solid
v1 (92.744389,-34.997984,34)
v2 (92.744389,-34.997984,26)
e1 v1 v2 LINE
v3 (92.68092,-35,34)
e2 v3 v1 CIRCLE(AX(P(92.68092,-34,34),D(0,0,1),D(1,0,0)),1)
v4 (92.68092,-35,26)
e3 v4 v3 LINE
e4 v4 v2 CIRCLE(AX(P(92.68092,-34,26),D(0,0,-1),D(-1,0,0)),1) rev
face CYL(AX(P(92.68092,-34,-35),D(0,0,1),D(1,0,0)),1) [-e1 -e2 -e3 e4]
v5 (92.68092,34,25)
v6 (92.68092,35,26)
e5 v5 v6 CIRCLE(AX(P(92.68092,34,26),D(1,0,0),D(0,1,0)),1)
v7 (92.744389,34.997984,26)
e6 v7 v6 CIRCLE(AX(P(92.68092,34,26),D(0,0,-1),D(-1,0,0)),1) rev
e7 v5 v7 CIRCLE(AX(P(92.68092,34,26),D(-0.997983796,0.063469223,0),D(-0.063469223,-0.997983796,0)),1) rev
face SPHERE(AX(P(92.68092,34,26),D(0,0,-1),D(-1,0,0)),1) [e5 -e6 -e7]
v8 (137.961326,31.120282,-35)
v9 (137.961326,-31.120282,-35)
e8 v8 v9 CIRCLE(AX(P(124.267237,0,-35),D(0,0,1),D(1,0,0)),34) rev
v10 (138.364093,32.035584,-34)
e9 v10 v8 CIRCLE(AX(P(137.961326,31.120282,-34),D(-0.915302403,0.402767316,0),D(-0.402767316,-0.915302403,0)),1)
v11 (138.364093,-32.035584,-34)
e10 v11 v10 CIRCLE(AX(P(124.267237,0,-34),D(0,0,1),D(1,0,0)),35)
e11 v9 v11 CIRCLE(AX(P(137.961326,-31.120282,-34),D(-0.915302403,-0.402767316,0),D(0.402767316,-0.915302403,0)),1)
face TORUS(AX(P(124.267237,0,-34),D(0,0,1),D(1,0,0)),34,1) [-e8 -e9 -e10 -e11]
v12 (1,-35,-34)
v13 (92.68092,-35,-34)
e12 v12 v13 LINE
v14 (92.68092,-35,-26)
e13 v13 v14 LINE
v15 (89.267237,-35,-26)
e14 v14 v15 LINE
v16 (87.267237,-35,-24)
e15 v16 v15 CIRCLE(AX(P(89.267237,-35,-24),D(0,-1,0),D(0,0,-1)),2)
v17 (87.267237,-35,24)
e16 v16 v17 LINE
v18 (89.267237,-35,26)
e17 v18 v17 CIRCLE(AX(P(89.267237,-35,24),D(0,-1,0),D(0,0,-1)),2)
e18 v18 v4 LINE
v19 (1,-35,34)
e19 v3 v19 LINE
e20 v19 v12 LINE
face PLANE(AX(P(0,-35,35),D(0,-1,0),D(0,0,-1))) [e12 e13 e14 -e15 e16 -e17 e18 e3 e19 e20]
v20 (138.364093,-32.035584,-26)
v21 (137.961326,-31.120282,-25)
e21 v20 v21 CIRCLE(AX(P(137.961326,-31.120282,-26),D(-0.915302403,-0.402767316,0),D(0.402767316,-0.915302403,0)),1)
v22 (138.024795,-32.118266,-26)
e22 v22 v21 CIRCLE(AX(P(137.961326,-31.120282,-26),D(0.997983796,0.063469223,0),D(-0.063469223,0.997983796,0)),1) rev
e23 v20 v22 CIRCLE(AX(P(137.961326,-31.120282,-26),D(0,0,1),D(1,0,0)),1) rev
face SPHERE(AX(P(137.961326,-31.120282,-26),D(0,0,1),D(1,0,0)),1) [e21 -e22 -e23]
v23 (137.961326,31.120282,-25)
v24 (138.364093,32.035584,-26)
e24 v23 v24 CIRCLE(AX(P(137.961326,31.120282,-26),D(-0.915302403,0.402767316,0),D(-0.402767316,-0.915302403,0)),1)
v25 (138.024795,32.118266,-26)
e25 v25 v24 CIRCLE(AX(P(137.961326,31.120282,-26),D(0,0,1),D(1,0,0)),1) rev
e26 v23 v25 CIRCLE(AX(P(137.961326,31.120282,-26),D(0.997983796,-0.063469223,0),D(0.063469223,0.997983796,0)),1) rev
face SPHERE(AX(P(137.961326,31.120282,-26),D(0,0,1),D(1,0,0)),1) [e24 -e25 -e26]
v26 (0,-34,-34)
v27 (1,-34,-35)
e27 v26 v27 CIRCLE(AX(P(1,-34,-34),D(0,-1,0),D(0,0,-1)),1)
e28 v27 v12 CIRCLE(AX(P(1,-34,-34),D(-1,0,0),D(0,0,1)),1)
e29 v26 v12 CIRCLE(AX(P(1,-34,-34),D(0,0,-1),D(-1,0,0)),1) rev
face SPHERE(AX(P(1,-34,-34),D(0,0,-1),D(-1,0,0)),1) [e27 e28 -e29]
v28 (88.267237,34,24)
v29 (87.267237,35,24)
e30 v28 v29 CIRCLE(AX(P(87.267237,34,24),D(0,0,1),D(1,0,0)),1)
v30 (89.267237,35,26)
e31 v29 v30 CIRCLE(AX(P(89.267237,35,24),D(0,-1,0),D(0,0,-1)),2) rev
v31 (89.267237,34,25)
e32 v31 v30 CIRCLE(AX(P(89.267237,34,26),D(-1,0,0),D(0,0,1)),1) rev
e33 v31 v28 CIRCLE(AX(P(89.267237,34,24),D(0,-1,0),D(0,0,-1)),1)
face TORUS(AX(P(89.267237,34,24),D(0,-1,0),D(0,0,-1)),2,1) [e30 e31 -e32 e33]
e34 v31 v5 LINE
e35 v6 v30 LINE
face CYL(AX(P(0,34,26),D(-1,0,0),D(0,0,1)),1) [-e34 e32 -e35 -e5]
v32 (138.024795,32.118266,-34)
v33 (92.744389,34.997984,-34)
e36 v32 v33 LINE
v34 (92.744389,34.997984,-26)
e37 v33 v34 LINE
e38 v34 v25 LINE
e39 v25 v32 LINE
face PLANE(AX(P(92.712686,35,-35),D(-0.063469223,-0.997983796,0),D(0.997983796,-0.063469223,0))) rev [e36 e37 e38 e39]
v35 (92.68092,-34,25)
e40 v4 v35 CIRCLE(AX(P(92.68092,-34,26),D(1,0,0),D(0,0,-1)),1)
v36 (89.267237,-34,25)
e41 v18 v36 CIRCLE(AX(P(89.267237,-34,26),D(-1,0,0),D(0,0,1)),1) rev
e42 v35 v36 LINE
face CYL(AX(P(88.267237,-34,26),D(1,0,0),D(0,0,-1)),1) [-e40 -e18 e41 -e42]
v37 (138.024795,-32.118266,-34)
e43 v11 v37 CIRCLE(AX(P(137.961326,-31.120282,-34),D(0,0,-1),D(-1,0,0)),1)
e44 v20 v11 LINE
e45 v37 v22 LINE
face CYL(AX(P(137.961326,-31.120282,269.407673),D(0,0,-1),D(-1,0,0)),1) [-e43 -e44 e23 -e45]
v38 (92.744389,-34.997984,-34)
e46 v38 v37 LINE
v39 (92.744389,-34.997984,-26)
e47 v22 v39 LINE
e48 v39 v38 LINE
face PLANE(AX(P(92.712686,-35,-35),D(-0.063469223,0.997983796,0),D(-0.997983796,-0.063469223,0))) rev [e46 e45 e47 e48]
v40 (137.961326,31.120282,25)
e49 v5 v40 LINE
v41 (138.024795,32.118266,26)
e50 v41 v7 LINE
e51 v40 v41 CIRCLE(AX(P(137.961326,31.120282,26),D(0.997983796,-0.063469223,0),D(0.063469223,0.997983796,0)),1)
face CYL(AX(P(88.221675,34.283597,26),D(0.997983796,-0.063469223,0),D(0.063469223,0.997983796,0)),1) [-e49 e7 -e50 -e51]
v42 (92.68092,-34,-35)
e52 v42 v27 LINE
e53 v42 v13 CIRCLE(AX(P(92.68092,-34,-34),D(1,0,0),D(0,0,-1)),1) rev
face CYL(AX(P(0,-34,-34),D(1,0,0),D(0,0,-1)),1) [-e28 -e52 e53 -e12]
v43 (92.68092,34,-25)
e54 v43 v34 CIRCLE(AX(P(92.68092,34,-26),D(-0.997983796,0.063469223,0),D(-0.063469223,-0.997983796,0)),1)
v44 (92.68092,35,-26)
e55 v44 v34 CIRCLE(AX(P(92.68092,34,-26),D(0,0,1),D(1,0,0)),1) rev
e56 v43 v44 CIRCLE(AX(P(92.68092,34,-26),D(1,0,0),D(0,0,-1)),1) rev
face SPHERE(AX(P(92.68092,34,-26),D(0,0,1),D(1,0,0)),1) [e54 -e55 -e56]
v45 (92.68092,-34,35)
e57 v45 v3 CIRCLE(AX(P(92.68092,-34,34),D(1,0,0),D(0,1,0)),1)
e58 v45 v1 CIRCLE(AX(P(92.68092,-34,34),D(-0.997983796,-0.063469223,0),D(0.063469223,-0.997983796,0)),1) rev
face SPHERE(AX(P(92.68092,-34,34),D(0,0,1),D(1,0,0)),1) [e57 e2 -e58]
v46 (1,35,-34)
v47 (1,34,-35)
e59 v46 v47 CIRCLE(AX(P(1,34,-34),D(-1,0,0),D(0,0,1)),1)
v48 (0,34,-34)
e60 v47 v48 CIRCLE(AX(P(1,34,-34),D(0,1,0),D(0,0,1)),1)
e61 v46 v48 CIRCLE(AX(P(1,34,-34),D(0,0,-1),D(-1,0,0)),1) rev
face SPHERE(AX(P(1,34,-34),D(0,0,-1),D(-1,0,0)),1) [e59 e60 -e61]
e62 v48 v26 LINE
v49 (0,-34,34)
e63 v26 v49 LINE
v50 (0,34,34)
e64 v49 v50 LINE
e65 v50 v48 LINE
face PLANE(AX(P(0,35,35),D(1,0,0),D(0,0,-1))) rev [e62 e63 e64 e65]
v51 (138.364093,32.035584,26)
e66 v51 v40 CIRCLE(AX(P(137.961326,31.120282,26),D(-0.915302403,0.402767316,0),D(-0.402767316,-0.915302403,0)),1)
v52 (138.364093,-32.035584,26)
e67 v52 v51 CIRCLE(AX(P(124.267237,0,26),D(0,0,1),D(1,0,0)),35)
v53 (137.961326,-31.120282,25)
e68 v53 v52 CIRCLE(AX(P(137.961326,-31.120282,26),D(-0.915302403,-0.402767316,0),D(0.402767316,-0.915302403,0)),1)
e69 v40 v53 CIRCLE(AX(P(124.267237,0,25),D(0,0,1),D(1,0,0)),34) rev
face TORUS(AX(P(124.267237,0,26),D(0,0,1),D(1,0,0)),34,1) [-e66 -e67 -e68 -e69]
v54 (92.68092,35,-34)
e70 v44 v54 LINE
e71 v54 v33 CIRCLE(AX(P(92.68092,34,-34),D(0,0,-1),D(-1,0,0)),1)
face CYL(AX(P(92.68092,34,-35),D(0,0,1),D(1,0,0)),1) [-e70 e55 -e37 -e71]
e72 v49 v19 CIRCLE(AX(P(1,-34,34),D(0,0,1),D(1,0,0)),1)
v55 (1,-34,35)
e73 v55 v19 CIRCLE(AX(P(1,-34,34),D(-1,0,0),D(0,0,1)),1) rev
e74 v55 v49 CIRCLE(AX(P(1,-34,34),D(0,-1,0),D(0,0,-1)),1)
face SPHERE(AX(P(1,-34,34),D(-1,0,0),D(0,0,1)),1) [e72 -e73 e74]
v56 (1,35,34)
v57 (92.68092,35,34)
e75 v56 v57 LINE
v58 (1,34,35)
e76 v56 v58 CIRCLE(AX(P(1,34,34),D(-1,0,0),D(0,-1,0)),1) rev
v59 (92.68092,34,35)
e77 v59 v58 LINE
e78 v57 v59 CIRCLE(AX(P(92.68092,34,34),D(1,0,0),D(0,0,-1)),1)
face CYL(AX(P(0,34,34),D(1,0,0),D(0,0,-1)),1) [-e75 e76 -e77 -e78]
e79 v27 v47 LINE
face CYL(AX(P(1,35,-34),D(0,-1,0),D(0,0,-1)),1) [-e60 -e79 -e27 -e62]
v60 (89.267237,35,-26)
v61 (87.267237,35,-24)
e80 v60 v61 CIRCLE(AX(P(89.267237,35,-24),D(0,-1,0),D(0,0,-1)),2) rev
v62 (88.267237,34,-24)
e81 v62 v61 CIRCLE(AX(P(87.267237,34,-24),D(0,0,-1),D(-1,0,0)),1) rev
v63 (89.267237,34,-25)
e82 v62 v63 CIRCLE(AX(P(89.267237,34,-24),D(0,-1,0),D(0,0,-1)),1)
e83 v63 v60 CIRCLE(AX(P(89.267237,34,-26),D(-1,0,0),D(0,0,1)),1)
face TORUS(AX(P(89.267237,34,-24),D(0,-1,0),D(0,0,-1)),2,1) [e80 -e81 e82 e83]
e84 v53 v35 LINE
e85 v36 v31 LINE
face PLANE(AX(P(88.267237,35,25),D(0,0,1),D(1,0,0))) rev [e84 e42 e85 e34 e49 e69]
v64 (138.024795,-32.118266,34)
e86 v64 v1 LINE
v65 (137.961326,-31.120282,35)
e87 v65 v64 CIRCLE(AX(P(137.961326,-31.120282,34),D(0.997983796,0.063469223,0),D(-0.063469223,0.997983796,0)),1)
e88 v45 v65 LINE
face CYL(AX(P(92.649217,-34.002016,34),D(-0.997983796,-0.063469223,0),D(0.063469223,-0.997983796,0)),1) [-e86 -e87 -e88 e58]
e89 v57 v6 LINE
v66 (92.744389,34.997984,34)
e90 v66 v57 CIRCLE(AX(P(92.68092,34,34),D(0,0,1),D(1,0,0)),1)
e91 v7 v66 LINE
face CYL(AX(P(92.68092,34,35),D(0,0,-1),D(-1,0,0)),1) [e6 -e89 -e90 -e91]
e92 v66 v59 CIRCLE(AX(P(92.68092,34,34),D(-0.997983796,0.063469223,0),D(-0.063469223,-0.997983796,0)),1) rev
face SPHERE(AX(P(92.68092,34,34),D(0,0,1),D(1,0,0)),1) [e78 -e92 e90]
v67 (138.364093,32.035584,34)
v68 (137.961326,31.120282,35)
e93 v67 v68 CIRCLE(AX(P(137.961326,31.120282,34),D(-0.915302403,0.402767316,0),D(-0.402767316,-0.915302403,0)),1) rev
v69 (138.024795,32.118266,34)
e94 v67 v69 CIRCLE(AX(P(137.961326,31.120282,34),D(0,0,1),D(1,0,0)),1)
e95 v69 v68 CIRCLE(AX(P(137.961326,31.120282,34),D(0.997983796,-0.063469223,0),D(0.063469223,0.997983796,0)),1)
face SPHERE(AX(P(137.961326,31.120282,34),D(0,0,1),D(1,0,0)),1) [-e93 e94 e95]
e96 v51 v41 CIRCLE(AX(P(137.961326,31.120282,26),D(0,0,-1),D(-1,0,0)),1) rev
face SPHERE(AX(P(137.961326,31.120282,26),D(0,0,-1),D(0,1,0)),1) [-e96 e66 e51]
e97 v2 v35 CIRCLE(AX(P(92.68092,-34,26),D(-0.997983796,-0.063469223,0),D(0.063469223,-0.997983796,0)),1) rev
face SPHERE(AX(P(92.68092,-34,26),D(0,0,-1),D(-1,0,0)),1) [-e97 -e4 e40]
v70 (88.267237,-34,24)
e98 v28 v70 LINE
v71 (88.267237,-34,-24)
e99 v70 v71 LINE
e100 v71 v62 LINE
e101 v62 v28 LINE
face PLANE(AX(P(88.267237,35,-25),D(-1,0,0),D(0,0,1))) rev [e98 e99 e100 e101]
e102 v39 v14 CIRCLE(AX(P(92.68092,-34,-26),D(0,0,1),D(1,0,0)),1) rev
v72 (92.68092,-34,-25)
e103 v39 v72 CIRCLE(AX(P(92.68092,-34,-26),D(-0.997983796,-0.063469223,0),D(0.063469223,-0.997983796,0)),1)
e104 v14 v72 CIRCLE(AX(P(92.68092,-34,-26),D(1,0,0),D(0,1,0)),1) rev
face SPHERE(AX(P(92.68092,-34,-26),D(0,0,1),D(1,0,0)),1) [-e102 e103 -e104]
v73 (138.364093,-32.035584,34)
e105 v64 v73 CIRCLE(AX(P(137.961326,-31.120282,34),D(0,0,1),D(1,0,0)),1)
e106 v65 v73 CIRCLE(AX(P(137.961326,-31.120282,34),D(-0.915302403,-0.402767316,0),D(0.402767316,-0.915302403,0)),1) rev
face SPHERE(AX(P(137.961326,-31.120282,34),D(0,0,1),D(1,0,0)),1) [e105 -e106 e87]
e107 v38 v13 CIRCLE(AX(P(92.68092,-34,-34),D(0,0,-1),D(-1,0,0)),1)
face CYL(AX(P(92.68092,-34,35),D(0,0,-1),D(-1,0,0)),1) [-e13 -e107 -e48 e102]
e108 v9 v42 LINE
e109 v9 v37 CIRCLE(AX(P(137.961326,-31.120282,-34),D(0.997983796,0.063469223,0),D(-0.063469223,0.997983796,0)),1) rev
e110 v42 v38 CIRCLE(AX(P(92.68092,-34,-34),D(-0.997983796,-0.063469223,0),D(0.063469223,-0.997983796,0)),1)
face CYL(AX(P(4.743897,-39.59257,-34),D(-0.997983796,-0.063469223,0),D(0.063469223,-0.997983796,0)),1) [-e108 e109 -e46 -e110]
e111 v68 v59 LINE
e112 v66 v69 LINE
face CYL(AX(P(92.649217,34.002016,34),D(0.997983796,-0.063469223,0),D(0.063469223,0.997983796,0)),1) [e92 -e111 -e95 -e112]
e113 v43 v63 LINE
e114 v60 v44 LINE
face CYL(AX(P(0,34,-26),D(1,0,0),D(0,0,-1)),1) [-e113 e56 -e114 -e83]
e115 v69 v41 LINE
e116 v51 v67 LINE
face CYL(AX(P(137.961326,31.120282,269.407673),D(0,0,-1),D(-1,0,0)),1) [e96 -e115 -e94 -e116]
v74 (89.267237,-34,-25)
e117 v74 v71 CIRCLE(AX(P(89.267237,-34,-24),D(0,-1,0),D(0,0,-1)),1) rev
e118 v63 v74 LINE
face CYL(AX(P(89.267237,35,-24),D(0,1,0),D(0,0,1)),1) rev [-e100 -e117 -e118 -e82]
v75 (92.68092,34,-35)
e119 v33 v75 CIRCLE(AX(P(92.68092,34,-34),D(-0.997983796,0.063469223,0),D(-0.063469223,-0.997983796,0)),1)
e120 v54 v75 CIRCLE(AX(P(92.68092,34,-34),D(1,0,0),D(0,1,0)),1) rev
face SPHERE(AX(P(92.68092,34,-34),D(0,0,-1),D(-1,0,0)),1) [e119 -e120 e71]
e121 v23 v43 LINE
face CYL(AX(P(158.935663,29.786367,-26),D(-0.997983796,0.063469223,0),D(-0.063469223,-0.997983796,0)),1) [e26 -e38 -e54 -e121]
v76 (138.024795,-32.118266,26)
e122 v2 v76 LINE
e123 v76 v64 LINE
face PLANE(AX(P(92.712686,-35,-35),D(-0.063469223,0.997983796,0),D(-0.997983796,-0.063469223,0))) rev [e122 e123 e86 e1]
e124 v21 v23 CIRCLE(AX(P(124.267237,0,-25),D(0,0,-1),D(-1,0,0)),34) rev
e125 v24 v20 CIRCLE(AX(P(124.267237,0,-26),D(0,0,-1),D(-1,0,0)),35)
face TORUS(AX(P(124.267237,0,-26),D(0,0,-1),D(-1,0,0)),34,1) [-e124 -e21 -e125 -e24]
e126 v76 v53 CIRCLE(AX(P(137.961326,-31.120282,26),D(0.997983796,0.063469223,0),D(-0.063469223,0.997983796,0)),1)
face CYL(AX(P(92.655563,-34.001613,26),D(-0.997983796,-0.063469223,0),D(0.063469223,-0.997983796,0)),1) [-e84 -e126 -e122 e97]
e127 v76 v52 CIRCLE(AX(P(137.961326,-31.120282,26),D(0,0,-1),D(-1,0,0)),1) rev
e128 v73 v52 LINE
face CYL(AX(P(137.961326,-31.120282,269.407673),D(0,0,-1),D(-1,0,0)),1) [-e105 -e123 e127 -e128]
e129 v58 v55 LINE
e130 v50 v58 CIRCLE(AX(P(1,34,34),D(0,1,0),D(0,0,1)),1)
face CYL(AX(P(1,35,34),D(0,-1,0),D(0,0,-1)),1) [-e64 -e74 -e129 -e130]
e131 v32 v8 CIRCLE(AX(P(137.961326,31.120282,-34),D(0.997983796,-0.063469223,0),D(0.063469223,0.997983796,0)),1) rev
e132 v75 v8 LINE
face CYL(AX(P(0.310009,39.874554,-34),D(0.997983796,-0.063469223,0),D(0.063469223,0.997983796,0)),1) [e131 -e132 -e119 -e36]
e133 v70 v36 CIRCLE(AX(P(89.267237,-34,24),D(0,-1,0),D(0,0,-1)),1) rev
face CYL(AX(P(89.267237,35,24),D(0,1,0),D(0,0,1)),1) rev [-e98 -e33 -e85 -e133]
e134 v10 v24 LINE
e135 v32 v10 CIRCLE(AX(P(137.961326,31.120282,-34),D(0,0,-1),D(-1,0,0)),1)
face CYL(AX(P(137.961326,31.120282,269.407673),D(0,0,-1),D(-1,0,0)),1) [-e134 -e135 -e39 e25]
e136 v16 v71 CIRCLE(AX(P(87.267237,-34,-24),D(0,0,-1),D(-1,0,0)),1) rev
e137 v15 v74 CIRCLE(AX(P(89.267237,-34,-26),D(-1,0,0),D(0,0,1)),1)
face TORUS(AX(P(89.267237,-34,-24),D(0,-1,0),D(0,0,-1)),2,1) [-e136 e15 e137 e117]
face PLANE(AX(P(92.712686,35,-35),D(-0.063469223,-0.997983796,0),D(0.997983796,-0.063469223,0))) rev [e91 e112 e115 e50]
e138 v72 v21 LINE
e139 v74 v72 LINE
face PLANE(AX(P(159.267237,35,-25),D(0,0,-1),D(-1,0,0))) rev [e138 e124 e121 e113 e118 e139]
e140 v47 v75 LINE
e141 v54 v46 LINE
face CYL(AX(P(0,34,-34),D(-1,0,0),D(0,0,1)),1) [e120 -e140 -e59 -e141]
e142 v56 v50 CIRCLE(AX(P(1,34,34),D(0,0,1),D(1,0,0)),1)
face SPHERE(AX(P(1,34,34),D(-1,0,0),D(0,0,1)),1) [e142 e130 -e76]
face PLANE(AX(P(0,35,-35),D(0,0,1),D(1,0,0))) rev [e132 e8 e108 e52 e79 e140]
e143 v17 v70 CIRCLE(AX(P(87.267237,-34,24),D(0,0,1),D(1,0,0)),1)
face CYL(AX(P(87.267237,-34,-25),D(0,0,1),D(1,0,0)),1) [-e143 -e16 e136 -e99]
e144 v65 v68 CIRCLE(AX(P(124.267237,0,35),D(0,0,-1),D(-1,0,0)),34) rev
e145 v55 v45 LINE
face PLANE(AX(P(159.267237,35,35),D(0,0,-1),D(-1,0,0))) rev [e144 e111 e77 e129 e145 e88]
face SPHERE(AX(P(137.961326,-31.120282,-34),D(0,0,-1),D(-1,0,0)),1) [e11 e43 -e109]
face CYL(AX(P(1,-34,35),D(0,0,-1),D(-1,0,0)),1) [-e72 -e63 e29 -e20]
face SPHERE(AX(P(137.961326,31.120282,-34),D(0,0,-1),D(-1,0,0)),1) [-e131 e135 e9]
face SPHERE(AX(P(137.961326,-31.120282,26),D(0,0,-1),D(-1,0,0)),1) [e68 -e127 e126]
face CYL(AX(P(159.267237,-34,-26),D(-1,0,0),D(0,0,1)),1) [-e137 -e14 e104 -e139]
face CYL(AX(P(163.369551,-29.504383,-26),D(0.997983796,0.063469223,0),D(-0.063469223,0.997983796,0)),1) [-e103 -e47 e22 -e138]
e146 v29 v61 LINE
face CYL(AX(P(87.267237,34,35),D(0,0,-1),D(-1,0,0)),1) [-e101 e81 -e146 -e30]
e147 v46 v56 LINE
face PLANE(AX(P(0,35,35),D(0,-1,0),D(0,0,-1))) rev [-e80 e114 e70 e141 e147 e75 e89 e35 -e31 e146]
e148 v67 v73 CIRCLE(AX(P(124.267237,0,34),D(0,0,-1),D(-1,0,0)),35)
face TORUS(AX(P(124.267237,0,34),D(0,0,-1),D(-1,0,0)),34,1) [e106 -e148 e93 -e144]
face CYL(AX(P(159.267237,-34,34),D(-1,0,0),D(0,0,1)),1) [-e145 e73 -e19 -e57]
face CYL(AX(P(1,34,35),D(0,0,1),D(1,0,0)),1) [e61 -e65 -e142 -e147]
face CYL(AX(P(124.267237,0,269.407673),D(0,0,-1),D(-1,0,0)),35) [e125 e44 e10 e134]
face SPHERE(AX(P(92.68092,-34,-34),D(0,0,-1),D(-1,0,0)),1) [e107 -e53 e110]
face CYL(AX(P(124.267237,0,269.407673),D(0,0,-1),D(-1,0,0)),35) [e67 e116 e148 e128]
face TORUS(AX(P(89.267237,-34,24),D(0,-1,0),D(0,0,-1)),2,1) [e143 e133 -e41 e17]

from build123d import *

# Parameters (mm, degrees)
BOSS_EXTRUDE1_DEPTH = 35
CUT_EXTRUDE1_DEPTH  = 70
CUT_EXTRUDE2_START  = -70
CUT_EXTRUDE2_DEPTH  = 70
FILLET3_R           = 1


# Read off the part's stored shape, not the designer's step: Cut-Extrude2
with BuildPart() as part:
    # Sketch2 → Boss-Extrude1 (new, symmetric)
    with BuildSketch(Plane(origin=(0, 0, 0), x_dir=(1, 0, 0), z_dir=(0, 1, 0))):
        Polygon((0, 0), (0, 70), (159.267236843, 70), (159.267236843, 60), (88.267236843, 60), (88.267236843, 10), (159.267236843, 10), (159.267236843, 0), align=None)
    extrude(amount=BOSS_EXTRUDE1_DEPTH, both=True)

    # Sketch3 → Cut-Extrude1 (cut)
    with BuildSketch(Plane.XY):
        Polygon((92.712686328, 35), (159.267236843, 30.767300383), (159.267236843, 35), align=None)
        Polygon((92.712686328, -35), (159.267236843, -30.767300383), (159.267236843, -35), align=None)
    extrude(amount=-CUT_EXTRUDE1_DEPTH, mode=Mode.SUBTRACT)

    # Cut-Extrude2 outline → Cut-Extrude2 (cut)
    with BuildSketch(Plane.XY.offset(CUT_EXTRUDE2_START)):
        with BuildLine():
            Line((159.267236843, 30.767300383), (138.20045286, 32.107094098))
            ThreePointArc((138.20045286, 32.107094098), (153.530375436, 19.200747894), (159.267236843, 0))
            Line((159.267236843, 0), (159.267236843, 30.767300383))
        make_face()
        with BuildLine():
            Line((159.267236843, -30.767300383), (159.267236843, 0))
            ThreePointArc((159.267236843, 0), (153.530375436, -19.200747894), (138.20045286, -32.107094098))
            Line((138.20045286, -32.107094098), (159.267236843, -30.767300383))
        make_face()
    extrude(amount=CUT_EXTRUDE2_DEPTH, mode=Mode.SUBTRACT)

    # Fillet3
    fillet3_edges = [part.edges().sort_by_distance(p)[0] for p in [
        (88.267236843, -35, -35),
        (46.356343164, -35, 0),
        (0, 0, 0),
        (0, 0, -70),
        (88.267236843, 0, -60),
        (88.267236843, 0, -10),
        (88.267236843, 35, -35),
        (90.489961586, 35, -60),
        (46.356343164, -35, -70),
        (90.489961586, -35, -10),
        (92.712686328, -35, -5),
        (90.489961586, 35, -10),
        (46.356343164, 35, -70),
        (92.712686328, 35, -5),
        (0, 35, -35),
        (92.712686328, 35, -65),
        (115.456569594, 33.553547049, -10),
        (115.456569594, 33.553547049, -70),
        (115.456569594, 33.553547049, 0),
        (92.712686328, -35, -65),
        (115.456569594, -33.553547049, -60),
        (46.356343164, 35, 0),
        (138.20045286, 32.107094098, -5),
        (115.456569594, 33.553547049, -60),
        (115.456569594, -33.553547049, 0),
        (115.456569594, -33.553547049, -10),
        (115.456569594, -33.553547049, -70),
        (153.530375436, -19.200747894, -60),
        (138.20045286, -32.107094098, -65),
        (153.530375436, 19.200747894, -70),
        (138.20045286, -32.107094098, -5),
        (153.530375436, 19.200747894, -10),
        (138.20045286, 32.107094098, -65),
        (153.530375436, 19.200747894, 0),
        (0, -35, -35),
        (90.489961586, -35, -60),
    ]]
    fillet(fillet3_edges, radius=FILLET3_R)


with BuildPart() as part_1:
    # Body-Move/Copy1: moved
    add(part.part.moved(Location((0, 0, 35))))


solid = part_1.part
